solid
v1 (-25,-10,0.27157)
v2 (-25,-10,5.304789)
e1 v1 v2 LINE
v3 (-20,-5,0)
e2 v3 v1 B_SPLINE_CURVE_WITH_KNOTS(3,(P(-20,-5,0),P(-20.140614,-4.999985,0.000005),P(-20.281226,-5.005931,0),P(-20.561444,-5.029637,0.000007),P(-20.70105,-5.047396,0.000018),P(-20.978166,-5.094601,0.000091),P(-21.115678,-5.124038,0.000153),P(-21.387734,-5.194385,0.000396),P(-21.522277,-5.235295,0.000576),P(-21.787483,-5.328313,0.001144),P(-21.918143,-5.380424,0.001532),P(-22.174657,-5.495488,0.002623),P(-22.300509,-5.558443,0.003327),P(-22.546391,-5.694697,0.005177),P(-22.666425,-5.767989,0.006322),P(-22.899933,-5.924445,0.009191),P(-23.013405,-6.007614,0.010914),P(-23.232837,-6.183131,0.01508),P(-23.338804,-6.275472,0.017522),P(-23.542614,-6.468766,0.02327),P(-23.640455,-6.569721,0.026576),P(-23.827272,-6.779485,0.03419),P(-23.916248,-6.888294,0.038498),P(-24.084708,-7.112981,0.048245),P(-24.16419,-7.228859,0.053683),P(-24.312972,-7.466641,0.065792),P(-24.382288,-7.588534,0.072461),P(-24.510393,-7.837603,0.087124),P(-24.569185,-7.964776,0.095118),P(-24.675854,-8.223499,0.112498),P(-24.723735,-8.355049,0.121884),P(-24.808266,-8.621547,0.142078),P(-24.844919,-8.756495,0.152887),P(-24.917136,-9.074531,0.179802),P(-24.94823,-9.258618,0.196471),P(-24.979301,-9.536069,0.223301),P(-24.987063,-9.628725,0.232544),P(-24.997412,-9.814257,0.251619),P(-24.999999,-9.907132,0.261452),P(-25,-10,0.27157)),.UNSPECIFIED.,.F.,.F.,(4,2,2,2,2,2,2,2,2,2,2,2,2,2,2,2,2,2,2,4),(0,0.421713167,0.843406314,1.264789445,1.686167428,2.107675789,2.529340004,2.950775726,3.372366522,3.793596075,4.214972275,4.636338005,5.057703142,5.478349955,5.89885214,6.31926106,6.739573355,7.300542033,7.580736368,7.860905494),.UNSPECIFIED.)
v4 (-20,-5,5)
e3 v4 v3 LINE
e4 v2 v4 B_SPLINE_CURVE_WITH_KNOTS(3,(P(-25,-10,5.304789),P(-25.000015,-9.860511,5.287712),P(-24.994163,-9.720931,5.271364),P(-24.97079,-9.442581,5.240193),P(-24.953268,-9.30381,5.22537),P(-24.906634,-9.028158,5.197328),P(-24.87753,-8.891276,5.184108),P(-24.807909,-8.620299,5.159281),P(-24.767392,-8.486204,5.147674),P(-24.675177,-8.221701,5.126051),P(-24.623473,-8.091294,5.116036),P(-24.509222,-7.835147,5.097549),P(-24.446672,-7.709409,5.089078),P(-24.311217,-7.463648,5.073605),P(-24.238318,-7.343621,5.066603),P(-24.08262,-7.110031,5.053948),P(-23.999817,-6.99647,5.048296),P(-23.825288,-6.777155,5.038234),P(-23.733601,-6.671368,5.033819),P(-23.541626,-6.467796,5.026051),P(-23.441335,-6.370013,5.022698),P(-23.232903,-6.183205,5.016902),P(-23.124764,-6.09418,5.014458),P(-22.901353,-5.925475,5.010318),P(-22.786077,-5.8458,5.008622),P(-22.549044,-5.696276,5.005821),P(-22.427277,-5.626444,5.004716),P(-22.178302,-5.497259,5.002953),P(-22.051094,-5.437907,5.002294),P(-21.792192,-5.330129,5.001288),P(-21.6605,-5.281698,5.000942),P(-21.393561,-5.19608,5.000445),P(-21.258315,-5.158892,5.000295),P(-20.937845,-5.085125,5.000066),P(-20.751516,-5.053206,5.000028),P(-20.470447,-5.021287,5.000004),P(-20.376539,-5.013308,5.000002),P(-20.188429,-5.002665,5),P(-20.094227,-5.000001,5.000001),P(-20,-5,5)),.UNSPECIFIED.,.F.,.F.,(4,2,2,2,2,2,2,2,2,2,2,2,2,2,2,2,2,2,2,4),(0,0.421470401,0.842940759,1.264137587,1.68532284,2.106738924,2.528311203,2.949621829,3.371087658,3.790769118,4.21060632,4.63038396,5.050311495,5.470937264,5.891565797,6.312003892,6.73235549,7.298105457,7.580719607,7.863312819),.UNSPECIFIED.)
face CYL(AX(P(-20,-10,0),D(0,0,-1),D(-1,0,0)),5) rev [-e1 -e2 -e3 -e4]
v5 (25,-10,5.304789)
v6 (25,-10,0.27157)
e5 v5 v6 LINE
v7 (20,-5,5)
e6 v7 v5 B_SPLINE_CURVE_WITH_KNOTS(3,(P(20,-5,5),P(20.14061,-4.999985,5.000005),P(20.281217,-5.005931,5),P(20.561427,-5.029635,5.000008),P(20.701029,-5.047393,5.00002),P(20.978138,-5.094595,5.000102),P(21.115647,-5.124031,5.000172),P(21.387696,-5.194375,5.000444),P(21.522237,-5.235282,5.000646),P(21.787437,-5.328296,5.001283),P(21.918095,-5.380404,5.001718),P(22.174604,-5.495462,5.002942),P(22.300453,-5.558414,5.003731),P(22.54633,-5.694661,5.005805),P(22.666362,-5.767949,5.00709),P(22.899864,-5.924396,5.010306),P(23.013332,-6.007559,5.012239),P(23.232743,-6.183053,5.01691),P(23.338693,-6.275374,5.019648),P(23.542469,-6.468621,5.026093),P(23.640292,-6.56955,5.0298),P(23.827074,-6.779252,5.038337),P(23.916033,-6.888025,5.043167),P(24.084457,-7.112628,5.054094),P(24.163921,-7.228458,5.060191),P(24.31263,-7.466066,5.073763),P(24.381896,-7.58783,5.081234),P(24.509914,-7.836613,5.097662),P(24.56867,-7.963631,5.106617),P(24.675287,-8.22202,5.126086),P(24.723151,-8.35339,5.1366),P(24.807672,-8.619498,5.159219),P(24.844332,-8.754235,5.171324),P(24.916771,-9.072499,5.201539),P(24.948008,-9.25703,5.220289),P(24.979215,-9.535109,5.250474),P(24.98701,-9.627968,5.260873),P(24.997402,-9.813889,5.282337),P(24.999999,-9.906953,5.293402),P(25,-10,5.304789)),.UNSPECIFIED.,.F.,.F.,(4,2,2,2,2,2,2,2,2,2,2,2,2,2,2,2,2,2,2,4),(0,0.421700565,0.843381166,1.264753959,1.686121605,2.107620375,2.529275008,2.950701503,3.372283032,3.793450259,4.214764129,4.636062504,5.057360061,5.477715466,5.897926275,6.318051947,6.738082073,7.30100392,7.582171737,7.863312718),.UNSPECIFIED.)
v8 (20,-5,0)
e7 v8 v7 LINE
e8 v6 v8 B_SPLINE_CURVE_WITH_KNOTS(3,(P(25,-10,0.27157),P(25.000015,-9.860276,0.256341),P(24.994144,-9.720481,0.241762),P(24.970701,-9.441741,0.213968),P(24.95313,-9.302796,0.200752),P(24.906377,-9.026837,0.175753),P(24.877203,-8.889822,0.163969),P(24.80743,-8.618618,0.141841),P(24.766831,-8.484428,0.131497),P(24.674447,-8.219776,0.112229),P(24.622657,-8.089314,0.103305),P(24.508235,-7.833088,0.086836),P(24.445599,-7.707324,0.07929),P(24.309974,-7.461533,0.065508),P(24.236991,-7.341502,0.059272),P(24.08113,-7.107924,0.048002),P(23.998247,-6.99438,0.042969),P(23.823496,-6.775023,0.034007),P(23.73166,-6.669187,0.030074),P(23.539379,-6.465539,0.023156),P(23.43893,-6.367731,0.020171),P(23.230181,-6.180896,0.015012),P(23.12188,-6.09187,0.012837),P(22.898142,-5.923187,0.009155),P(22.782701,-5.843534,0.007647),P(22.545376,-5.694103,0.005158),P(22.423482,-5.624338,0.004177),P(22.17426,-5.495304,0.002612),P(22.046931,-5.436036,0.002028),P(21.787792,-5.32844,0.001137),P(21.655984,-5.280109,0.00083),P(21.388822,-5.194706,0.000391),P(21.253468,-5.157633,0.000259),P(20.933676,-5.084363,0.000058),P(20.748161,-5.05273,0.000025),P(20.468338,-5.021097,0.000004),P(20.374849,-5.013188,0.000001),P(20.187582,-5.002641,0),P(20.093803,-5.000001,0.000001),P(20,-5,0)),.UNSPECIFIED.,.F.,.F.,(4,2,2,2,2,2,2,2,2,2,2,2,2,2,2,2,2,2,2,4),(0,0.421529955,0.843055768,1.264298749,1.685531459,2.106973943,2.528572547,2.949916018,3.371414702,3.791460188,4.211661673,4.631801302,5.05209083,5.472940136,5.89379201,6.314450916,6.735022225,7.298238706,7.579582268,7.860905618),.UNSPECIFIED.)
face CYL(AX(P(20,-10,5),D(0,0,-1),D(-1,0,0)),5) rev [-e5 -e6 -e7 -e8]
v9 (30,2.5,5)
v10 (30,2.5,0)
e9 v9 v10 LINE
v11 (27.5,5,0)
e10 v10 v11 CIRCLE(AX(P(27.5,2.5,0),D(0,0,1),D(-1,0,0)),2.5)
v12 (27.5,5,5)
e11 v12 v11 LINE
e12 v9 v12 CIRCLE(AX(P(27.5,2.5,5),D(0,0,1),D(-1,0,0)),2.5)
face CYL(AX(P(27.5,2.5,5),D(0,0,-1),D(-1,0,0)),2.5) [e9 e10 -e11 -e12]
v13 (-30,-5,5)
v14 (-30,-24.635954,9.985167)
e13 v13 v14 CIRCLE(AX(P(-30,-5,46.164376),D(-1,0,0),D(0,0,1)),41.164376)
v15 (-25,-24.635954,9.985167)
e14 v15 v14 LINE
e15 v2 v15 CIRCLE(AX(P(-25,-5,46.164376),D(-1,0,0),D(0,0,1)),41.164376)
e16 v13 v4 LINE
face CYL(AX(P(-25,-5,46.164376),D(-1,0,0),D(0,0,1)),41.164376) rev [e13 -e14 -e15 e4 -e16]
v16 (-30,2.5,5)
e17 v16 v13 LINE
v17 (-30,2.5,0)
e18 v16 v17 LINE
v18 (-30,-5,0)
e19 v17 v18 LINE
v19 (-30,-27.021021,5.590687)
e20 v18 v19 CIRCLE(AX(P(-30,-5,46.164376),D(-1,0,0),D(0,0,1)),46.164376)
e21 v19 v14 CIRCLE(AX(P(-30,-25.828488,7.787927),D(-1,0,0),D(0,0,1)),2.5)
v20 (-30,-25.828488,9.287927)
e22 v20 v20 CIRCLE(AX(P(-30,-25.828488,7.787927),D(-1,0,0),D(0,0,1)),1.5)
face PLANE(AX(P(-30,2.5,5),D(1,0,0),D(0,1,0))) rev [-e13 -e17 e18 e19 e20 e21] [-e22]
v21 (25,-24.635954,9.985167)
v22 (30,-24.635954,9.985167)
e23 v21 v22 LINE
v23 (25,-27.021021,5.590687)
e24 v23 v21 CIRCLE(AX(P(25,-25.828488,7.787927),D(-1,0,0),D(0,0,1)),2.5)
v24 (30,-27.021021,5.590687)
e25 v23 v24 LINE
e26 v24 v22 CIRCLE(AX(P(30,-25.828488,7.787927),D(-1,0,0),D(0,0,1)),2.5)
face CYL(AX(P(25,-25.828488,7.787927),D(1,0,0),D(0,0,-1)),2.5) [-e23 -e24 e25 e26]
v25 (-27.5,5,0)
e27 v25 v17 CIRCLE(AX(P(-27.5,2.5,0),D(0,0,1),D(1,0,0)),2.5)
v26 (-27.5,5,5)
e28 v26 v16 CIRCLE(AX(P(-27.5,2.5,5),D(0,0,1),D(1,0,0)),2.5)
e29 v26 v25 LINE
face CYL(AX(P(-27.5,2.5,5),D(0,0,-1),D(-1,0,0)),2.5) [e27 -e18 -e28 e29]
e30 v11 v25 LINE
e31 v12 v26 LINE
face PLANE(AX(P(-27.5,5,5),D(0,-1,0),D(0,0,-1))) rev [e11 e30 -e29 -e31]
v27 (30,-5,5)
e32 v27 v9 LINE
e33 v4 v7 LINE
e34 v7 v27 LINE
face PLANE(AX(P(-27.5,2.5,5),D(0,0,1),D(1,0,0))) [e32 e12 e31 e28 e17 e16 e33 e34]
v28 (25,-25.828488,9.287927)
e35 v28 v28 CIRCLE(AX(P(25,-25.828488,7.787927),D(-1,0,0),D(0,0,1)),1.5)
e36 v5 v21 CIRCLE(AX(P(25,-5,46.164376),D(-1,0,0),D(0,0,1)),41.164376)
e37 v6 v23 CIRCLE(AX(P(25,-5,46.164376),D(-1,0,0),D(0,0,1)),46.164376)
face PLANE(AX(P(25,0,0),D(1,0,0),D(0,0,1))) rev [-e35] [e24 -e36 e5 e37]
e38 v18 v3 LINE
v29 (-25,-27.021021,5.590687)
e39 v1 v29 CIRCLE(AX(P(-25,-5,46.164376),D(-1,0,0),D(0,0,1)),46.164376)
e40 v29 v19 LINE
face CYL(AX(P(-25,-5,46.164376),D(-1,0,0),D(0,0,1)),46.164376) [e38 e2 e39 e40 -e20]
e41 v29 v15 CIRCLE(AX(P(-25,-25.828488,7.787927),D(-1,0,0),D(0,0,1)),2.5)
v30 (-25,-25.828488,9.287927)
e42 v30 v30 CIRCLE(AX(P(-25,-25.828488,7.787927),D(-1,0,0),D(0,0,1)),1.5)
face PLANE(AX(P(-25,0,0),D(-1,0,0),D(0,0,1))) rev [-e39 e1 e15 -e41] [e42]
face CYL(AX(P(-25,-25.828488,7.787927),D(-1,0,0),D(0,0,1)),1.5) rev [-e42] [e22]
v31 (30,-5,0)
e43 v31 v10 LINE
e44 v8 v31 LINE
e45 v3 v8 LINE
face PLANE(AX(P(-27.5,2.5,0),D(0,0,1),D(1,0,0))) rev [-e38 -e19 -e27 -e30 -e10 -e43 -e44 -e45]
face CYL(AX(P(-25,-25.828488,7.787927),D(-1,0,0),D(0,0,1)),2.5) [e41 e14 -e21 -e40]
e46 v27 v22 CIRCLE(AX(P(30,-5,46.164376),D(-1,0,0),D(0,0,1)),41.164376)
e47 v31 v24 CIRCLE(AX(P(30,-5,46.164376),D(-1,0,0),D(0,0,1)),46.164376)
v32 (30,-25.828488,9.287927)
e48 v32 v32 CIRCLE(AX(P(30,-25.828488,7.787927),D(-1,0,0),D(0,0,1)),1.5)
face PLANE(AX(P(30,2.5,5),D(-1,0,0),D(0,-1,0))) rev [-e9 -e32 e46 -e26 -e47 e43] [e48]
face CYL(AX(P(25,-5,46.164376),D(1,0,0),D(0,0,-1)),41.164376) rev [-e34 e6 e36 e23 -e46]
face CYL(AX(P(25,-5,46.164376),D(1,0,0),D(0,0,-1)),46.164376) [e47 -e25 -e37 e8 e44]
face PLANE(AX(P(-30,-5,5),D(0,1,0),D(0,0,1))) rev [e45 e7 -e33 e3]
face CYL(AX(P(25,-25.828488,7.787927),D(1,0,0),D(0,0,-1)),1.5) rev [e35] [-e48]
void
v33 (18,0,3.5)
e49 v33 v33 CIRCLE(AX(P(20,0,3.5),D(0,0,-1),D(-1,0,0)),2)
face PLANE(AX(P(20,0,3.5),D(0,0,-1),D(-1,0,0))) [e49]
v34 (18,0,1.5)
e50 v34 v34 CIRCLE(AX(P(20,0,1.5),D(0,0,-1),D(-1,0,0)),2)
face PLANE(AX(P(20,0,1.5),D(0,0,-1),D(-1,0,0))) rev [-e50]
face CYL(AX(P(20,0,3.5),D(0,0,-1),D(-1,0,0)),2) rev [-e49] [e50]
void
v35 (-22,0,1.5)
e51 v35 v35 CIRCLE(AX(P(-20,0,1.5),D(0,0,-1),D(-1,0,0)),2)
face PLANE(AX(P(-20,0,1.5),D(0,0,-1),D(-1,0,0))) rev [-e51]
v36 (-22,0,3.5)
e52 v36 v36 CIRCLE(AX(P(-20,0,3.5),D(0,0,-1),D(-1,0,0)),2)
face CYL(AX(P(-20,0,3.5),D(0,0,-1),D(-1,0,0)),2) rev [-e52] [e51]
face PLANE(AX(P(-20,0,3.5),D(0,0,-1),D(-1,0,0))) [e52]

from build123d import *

# Parameters (mm, degrees)
BOSS_EXTRU_1_DEPTH      = 5
ESQUISSE3_R             = 1.5
BOSS_EXTRU_2_DEPTH      = 5
CONG_1_R                = 5
ENL_V_START             = -1.5
ESQUISSE4_R             = 2
ENL_V_MAT_EXTRU_1_DEPTH = 2


with BuildPart() as part:
    # Esquisse2 → Boss.-Extru.1 (new body)
    with BuildSketch(Plane.XY):
        with BuildLine():
            Line((-27.5, 5), (27.5, 5))
            ThreePointArc((27.5, 5), (29.267766953, 4.267766953), (30, 2.5))
            Line((30, 2.5), (30, -5))
            Line((30, -5), (-30, -5))
            Line((-30, -5), (-30, 2.5))
            ThreePointArc((-30, 2.5), (-29.267766953, 4.267766953), (-27.5, 5))
        make_face()
    extrude(amount=BOSS_EXTRU_1_DEPTH)

    # Esquisse3 → Boss.-Extru.2 (add)
    with BuildSketch(Plane.ZY.offset(30)):
        with BuildLine():
            ThreePointArc((0, -5), (1.419495531, -16.359810014), (5.590686777, -27.021020765))
            ThreePointArc((5.590686777, -27.021020765), (8.980460201, -28.025727757), (9.985167192, -24.635954333))
            ThreePointArc((9.985167192, -24.635954333), (6.265751924, -15.129444636), (5, -5))
            Line((5, -5), (0, -5))
        make_face()
        with Locations((7.787926985, -25.828487549)):
            Circle(ESQUISSE3_R, mode=Mode.SUBTRACT)
    boss_extru_2 = extrude(amount=-BOSS_EXTRU_2_DEPTH)

    # Symétrie1: Boss.-Extru.2 across plane
    add(boss_extru_2.mirror(Plane(origin=(0, 0, 0), x_dir=(0, 0, 1), z_dir=(1, 0, 0))))

    # Congé1
    # the kernel refuses this fillet: 5 mm, written as the material it adds along each edge
    with BuildSketch(Plane(origin=(-25, -5, 17.5), x_dir=(1, 0, 0), z_dir=(0, 0, -1))) as cong_1_piece_1_section:
        with BuildLine():
            CenterArc((CONG_1_R, CONG_1_R), CONG_1_R, 180, 90)
            Line((0, CONG_1_R), (0, 0))
            Line((0, 0), (CONG_1_R, 0))
        make_face()
    cong_1_piece_1 = extrude(amount=30, mode=Mode.PRIVATE)
    cong_1_piece_1 = cong_1_piece_1 & Plane(origin=(-24.565871858, -5, 46.164376109), x_dir=(0, 0, -1), z_dir=(-1, 0, 0)) * Cylinder(46.164376109, 80, mode=Mode.PRIVATE)
    cong_1_piece_1 = cong_1_piece_1 - Plane(origin=(-24.565871858, -5, 46.164376109), x_dir=(0, -0.4770132864696082, -0.8788960828968709), z_dir=(-1, 0, 0)) * Cylinder(41.164376109, 80, mode=Mode.PRIVATE)
    add(cong_1_piece_1)
    with BuildSketch(Plane(origin=(25, -5, 17.5), x_dir=(-1, 0, 0), z_dir=(0, 0, -1))) as cong_1_piece_2_section:
        with BuildLine():
            CenterArc((CONG_1_R, -CONG_1_R), CONG_1_R, 90, 90)
            Line((0, -CONG_1_R), (0, 0))
            Line((0, 0), (CONG_1_R, 0))
        make_face()
    cong_1_piece_2 = extrude(amount=30, mode=Mode.PRIVATE)
    cong_1_piece_2 = cong_1_piece_2 & Plane(origin=(24.565871858, -5, 46.164376109), x_dir=(0, 0, -1), z_dir=(1, 0, 0)) * Cylinder(46.164376109, 80, mode=Mode.PRIVATE)
    cong_1_piece_2 = cong_1_piece_2 - Plane(origin=(24.565871858, -5, 46.164376109), x_dir=(0, -0.4770132864696082, -0.8788960828968709), z_dir=(1, 0, 0)) * Cylinder(41.164376109, 80, mode=Mode.PRIVATE)
    add(cong_1_piece_2)

    # Esquisse4 → Enlèv. mat.-Extru.1 (cut)
    with BuildSketch(Plane(origin=(0, 0, 0), x_dir=(-1, 0, 0), z_dir=(0, 0, -1)).offset(ENL_V_START)):
        with Locations((-20, 0)):
            Circle(ESQUISSE4_R)
        with Locations((20, 0)):
            Circle(ESQUISSE4_R)
    extrude(amount=-ENL_V_MAT_EXTRU_1_DEPTH, mode=Mode.SUBTRACT)


solid = part.part
